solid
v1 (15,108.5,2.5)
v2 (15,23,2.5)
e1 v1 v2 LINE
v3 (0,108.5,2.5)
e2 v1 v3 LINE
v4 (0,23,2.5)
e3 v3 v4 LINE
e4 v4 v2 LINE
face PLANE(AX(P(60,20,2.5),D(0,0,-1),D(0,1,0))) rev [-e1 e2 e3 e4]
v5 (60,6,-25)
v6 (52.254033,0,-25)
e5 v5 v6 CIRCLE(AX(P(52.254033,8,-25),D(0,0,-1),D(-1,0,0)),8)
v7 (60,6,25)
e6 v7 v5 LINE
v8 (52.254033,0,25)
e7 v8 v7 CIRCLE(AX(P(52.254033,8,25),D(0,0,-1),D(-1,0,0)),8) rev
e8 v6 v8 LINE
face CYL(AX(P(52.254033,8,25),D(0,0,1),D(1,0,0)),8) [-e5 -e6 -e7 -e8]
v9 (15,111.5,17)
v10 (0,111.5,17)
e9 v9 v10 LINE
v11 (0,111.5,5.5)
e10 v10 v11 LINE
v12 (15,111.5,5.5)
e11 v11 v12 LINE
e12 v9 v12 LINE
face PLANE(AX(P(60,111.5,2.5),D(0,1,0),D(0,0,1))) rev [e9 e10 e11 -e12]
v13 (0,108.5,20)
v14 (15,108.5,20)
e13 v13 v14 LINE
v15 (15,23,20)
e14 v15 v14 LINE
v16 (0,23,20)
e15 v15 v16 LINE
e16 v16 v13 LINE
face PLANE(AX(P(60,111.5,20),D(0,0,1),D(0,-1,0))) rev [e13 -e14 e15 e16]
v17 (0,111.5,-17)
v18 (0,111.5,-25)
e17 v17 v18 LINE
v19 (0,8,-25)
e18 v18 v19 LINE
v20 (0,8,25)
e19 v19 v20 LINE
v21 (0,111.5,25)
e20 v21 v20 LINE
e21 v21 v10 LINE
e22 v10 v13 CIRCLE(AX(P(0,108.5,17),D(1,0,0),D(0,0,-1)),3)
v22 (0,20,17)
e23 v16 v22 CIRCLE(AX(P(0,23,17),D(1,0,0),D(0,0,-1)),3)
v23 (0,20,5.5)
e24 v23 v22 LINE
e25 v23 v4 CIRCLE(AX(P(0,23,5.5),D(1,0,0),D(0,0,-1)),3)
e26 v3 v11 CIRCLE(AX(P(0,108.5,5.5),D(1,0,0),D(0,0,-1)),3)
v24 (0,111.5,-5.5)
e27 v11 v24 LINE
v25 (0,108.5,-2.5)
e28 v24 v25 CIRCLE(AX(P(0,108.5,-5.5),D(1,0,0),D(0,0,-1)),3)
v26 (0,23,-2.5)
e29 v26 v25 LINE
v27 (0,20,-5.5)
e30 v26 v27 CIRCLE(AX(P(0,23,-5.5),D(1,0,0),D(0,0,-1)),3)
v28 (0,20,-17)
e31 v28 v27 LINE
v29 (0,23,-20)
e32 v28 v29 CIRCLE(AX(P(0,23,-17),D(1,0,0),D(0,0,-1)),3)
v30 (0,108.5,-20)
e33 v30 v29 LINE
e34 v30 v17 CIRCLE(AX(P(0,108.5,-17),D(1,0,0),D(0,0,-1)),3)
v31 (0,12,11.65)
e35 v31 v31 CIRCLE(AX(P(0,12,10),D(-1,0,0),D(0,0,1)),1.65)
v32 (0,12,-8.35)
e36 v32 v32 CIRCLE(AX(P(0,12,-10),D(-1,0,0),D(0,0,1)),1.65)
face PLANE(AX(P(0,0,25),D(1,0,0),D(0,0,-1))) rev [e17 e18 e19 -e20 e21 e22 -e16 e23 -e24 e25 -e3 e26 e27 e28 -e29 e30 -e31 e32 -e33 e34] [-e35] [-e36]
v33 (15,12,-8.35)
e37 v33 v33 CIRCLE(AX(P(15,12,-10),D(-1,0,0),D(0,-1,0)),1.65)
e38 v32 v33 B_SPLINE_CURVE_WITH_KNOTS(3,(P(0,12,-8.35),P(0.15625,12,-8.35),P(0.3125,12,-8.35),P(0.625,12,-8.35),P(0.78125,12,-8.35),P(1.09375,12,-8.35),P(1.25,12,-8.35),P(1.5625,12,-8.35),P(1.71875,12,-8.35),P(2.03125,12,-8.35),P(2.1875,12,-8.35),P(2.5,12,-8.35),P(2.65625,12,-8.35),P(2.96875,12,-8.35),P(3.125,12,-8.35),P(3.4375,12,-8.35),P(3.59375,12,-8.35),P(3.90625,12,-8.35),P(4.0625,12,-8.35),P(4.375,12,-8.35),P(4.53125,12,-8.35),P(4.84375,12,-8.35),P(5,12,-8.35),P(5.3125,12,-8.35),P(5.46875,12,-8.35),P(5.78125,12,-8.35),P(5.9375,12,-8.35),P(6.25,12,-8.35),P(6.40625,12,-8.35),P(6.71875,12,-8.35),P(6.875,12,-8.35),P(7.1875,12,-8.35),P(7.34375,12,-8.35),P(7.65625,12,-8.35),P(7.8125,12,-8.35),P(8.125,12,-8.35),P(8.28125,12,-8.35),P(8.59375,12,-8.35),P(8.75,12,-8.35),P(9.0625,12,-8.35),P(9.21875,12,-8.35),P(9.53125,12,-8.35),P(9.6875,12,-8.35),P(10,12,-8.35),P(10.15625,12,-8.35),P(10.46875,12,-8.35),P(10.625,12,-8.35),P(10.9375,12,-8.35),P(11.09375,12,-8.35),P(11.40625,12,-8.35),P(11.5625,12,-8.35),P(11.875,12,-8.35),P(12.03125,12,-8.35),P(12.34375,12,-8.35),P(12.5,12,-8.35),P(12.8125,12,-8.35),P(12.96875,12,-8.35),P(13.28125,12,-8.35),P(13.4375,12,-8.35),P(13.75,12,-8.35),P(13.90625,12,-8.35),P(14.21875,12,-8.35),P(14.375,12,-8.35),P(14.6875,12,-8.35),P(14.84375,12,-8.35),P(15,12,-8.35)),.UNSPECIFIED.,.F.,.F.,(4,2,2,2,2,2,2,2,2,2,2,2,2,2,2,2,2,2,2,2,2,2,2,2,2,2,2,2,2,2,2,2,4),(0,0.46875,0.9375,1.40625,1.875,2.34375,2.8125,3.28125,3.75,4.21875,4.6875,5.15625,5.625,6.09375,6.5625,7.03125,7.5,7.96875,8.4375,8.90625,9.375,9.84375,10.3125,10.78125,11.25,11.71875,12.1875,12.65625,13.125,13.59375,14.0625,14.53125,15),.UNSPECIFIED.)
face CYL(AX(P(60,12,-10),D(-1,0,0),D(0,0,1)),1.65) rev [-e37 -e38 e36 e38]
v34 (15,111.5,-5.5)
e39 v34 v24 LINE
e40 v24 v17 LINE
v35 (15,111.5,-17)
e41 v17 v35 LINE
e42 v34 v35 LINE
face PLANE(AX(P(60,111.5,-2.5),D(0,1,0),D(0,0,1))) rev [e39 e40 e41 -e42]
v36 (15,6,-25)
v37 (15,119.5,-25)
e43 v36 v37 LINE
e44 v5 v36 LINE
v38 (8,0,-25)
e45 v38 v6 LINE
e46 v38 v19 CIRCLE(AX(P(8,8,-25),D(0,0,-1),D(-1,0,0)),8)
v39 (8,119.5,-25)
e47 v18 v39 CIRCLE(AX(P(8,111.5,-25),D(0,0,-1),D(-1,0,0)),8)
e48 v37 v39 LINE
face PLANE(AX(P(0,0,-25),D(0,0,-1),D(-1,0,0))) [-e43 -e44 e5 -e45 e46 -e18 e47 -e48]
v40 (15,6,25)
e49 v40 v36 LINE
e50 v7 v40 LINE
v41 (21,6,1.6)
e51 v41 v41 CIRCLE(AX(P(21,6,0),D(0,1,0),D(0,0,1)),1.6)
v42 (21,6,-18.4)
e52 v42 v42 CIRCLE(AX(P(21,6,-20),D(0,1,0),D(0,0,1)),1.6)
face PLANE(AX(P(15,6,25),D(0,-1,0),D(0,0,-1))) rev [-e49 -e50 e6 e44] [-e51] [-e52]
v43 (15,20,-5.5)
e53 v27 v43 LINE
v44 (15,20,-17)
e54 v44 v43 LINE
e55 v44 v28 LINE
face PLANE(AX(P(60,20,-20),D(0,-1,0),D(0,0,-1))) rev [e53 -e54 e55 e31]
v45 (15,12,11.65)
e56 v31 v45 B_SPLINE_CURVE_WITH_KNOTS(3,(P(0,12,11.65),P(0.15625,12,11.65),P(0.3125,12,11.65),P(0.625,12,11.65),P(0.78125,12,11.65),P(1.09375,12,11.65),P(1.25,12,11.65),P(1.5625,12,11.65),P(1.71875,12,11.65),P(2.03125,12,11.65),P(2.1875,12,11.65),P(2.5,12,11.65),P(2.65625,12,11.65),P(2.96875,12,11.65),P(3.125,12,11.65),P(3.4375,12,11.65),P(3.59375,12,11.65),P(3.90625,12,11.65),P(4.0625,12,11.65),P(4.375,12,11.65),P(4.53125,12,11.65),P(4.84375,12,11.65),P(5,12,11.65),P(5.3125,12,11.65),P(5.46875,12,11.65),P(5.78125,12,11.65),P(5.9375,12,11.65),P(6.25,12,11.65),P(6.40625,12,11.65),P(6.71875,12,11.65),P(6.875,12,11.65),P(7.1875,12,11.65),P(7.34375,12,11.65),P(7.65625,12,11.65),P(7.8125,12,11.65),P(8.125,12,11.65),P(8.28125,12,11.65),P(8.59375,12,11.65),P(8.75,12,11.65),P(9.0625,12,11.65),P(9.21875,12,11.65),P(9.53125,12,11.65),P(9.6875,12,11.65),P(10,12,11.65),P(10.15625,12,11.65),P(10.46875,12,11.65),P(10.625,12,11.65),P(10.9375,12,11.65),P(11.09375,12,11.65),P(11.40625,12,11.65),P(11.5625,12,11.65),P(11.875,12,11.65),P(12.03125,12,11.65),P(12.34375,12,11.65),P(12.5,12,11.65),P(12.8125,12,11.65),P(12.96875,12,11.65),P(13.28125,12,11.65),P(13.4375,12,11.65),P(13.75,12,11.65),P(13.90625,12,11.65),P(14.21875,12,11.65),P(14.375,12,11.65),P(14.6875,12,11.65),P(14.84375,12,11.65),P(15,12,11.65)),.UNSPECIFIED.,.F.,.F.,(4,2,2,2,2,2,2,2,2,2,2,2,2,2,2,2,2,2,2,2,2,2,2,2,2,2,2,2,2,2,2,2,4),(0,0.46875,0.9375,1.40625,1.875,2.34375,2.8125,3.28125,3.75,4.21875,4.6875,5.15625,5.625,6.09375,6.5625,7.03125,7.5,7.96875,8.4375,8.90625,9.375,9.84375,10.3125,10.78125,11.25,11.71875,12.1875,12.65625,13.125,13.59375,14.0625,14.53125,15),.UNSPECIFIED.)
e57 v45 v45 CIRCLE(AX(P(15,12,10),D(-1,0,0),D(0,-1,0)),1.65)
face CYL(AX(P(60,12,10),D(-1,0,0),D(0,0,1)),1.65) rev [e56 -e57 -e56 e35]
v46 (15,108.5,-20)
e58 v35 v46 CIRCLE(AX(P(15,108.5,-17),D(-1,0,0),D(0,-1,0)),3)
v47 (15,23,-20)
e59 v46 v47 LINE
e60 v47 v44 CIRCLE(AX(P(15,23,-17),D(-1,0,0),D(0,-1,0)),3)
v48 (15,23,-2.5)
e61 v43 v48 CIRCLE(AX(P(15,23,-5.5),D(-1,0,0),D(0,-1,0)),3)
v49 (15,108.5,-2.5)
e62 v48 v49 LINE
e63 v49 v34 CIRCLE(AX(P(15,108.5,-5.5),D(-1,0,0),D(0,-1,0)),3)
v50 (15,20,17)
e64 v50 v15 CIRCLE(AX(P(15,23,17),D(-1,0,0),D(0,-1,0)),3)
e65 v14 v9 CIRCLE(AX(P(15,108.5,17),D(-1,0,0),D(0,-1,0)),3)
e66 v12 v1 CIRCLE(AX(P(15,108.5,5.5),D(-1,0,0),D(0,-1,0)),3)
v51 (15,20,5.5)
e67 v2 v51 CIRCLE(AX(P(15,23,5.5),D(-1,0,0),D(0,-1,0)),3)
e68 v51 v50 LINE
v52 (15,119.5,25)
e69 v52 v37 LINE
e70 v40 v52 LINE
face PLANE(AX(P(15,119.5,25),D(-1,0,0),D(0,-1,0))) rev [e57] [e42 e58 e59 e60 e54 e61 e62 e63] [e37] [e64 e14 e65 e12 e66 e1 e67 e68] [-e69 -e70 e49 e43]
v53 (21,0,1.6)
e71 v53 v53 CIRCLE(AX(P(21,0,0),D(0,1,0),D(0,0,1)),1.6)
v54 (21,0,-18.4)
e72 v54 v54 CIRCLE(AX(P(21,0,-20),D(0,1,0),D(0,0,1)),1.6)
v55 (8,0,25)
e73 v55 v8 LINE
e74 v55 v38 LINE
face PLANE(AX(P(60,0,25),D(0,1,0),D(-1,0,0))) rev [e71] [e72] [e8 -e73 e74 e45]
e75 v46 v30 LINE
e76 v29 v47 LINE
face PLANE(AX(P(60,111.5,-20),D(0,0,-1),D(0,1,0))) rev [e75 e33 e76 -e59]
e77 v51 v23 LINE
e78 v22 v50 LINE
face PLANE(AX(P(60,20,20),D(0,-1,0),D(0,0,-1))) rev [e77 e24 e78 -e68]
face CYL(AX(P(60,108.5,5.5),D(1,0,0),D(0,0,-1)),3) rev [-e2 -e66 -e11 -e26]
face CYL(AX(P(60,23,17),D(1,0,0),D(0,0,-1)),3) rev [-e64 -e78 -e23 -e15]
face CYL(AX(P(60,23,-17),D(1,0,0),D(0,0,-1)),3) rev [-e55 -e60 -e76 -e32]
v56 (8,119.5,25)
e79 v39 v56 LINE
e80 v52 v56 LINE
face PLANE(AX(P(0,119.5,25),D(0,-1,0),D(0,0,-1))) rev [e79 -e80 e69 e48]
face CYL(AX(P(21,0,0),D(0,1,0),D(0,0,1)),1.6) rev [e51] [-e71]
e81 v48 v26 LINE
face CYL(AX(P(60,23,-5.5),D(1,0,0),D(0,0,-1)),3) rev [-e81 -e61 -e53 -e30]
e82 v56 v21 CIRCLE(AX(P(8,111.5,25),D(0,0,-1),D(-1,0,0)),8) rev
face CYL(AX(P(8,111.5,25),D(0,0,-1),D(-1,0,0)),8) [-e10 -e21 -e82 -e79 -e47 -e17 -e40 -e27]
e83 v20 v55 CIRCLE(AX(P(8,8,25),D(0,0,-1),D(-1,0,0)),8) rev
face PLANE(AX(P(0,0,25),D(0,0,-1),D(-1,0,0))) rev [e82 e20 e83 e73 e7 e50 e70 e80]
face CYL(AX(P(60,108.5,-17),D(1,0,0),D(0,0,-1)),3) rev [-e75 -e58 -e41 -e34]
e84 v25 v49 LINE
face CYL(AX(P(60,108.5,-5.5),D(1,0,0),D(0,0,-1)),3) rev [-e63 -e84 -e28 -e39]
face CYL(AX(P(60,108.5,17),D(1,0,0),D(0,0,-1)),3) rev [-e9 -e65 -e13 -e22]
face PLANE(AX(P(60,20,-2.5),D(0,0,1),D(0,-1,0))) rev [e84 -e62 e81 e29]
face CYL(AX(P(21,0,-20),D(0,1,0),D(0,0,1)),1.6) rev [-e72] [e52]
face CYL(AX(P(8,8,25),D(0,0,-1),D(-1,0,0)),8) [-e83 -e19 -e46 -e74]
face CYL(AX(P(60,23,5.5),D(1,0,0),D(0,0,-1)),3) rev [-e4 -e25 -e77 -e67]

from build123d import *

# Parameters (mm, degrees)
EXTRUDE_1_DEPTH     = 25
FILLET_1_R          = 8
SKETCH_2_R          = 1.65
CUT_EXTRUDE_1_DEPTH = 137.034003102
SKETCH_3_R          = 1.6
CUT_EXTRUDE_2_DEPTH = 131.794686436
SKETCH_4_W          = 17.5
SKETCH_4_H          = 91.5
CUT_EXTRUDE_3_DEPTH = 137.034003102
FILLET_2_R          = 3


with BuildPart() as part:
    # 草图1 → 凸台-拉伸1 (new, symmetric)
    with BuildSketch(Plane.XY):
        Polygon((0, 0), (0, 119.5), (15, 119.5), (15, 6), (60, 6), (60, 0), align=None)
    extrude(amount=EXTRUDE_1_DEPTH, both=True)

    # 圆角1
    # the kernel refuses this fillet: 8 mm, written as the material it takes off along each edge
    with BuildSketch(Plane(origin=(0, 119.5, 45), x_dir=(0, -1, 0), z_dir=(0, 0, -1)), Plane(origin=(0, 0, -45), x_dir=(0, 1, 0), z_dir=(0, 0, 1))) as fillet_1_piece_1:
        with BuildLine():
            CenterArc((FILLET_1_R, -FILLET_1_R), FILLET_1_R, 90, 90)
            Line((0, -FILLET_1_R), (-FILLET_1_R * 0.02, -FILLET_1_R))
            Line((-FILLET_1_R * 0.02, -FILLET_1_R), (-FILLET_1_R * 0.02, FILLET_1_R * 0.02))
            Line((-FILLET_1_R * 0.02, FILLET_1_R * 0.02), (FILLET_1_R, FILLET_1_R * 0.02))
            Line((FILLET_1_R, FILLET_1_R * 0.02), (FILLET_1_R, 0))
        make_face()
    extrude(amount=90, mode=Mode.SUBTRACT)
    with BuildSketch(Plane(origin=(60, 0, -44.364916731), x_dir=(0, 1, 0), z_dir=(0, 0, 1))) as fillet_1_piece_2:
        with BuildLine():
            CenterArc((8, 7.745966692), FILLET_1_R, 180, 75.522487814)
            Line((0, 7.745966692), (-0.16, 7.745966692))
            Line((-0.16, 7.745966692), (-0.16, 0))
            Line((-0.16, 0), (0, -0.16))
            ThreePointArc((0, -0.16), (3, -0.16), (5.96, -0.154919334))
            Line((5.96, -0.154919334), (6, 0))
        make_face()
    extrude(amount=88.729833462, mode=Mode.SUBTRACT)

    # 草图2 → 切除-拉伸1 (cut, through all)
    with BuildSketch(Plane.ZY):
        with Locations((10, 12)):
            Circle(SKETCH_2_R)
        with Locations((-10, 12)):
            Circle(SKETCH_2_R)
    extrude(amount=-CUT_EXTRUDE_1_DEPTH, mode=Mode.SUBTRACT)

    # 草图3 → 切除-拉伸2 (cut, through all)
    with BuildSketch(Plane(origin=(0, 6, 0), x_dir=(1, 0, 0), z_dir=(0, 1, 0))):
        with Locations(Location((21, 0, 0), (0, 0, 270))):
            Circle(SKETCH_3_R)
        with Locations(Location((21, 20, 0), (0, 0, 270))):
            Circle(SKETCH_3_R)
    extrude(amount=-CUT_EXTRUDE_2_DEPTH, mode=Mode.SUBTRACT)

    # 草图4 → 切除-拉伸3 (cut, through all)
    with BuildSketch(Plane.ZY):
        with Locations((-11.25, 65.75)):
            Rectangle(SKETCH_4_W, SKETCH_4_H)
        with Locations((11.25, 65.75)):
            Rectangle(SKETCH_4_W, SKETCH_4_H)
    extrude(amount=-CUT_EXTRUDE_3_DEPTH, mode=Mode.SUBTRACT)

    # 圆角2
    fillet_2_edges = [part.edges().sort_by_distance(p)[0] for p in [
        (7.5, 111.5, -20),
        (7.5, 20, -2.5),
        (7.5, 20, -20),
        (7.5, 111.5, -2.5),
        (7.5, 111.5, 2.5),
        (7.5, 20, 20),
        (7.5, 20, 2.5),
        (7.5, 111.5, 20),
    ]]
    fillet(fillet_2_edges, radius=FILLET_2_R)


solid = part.part
